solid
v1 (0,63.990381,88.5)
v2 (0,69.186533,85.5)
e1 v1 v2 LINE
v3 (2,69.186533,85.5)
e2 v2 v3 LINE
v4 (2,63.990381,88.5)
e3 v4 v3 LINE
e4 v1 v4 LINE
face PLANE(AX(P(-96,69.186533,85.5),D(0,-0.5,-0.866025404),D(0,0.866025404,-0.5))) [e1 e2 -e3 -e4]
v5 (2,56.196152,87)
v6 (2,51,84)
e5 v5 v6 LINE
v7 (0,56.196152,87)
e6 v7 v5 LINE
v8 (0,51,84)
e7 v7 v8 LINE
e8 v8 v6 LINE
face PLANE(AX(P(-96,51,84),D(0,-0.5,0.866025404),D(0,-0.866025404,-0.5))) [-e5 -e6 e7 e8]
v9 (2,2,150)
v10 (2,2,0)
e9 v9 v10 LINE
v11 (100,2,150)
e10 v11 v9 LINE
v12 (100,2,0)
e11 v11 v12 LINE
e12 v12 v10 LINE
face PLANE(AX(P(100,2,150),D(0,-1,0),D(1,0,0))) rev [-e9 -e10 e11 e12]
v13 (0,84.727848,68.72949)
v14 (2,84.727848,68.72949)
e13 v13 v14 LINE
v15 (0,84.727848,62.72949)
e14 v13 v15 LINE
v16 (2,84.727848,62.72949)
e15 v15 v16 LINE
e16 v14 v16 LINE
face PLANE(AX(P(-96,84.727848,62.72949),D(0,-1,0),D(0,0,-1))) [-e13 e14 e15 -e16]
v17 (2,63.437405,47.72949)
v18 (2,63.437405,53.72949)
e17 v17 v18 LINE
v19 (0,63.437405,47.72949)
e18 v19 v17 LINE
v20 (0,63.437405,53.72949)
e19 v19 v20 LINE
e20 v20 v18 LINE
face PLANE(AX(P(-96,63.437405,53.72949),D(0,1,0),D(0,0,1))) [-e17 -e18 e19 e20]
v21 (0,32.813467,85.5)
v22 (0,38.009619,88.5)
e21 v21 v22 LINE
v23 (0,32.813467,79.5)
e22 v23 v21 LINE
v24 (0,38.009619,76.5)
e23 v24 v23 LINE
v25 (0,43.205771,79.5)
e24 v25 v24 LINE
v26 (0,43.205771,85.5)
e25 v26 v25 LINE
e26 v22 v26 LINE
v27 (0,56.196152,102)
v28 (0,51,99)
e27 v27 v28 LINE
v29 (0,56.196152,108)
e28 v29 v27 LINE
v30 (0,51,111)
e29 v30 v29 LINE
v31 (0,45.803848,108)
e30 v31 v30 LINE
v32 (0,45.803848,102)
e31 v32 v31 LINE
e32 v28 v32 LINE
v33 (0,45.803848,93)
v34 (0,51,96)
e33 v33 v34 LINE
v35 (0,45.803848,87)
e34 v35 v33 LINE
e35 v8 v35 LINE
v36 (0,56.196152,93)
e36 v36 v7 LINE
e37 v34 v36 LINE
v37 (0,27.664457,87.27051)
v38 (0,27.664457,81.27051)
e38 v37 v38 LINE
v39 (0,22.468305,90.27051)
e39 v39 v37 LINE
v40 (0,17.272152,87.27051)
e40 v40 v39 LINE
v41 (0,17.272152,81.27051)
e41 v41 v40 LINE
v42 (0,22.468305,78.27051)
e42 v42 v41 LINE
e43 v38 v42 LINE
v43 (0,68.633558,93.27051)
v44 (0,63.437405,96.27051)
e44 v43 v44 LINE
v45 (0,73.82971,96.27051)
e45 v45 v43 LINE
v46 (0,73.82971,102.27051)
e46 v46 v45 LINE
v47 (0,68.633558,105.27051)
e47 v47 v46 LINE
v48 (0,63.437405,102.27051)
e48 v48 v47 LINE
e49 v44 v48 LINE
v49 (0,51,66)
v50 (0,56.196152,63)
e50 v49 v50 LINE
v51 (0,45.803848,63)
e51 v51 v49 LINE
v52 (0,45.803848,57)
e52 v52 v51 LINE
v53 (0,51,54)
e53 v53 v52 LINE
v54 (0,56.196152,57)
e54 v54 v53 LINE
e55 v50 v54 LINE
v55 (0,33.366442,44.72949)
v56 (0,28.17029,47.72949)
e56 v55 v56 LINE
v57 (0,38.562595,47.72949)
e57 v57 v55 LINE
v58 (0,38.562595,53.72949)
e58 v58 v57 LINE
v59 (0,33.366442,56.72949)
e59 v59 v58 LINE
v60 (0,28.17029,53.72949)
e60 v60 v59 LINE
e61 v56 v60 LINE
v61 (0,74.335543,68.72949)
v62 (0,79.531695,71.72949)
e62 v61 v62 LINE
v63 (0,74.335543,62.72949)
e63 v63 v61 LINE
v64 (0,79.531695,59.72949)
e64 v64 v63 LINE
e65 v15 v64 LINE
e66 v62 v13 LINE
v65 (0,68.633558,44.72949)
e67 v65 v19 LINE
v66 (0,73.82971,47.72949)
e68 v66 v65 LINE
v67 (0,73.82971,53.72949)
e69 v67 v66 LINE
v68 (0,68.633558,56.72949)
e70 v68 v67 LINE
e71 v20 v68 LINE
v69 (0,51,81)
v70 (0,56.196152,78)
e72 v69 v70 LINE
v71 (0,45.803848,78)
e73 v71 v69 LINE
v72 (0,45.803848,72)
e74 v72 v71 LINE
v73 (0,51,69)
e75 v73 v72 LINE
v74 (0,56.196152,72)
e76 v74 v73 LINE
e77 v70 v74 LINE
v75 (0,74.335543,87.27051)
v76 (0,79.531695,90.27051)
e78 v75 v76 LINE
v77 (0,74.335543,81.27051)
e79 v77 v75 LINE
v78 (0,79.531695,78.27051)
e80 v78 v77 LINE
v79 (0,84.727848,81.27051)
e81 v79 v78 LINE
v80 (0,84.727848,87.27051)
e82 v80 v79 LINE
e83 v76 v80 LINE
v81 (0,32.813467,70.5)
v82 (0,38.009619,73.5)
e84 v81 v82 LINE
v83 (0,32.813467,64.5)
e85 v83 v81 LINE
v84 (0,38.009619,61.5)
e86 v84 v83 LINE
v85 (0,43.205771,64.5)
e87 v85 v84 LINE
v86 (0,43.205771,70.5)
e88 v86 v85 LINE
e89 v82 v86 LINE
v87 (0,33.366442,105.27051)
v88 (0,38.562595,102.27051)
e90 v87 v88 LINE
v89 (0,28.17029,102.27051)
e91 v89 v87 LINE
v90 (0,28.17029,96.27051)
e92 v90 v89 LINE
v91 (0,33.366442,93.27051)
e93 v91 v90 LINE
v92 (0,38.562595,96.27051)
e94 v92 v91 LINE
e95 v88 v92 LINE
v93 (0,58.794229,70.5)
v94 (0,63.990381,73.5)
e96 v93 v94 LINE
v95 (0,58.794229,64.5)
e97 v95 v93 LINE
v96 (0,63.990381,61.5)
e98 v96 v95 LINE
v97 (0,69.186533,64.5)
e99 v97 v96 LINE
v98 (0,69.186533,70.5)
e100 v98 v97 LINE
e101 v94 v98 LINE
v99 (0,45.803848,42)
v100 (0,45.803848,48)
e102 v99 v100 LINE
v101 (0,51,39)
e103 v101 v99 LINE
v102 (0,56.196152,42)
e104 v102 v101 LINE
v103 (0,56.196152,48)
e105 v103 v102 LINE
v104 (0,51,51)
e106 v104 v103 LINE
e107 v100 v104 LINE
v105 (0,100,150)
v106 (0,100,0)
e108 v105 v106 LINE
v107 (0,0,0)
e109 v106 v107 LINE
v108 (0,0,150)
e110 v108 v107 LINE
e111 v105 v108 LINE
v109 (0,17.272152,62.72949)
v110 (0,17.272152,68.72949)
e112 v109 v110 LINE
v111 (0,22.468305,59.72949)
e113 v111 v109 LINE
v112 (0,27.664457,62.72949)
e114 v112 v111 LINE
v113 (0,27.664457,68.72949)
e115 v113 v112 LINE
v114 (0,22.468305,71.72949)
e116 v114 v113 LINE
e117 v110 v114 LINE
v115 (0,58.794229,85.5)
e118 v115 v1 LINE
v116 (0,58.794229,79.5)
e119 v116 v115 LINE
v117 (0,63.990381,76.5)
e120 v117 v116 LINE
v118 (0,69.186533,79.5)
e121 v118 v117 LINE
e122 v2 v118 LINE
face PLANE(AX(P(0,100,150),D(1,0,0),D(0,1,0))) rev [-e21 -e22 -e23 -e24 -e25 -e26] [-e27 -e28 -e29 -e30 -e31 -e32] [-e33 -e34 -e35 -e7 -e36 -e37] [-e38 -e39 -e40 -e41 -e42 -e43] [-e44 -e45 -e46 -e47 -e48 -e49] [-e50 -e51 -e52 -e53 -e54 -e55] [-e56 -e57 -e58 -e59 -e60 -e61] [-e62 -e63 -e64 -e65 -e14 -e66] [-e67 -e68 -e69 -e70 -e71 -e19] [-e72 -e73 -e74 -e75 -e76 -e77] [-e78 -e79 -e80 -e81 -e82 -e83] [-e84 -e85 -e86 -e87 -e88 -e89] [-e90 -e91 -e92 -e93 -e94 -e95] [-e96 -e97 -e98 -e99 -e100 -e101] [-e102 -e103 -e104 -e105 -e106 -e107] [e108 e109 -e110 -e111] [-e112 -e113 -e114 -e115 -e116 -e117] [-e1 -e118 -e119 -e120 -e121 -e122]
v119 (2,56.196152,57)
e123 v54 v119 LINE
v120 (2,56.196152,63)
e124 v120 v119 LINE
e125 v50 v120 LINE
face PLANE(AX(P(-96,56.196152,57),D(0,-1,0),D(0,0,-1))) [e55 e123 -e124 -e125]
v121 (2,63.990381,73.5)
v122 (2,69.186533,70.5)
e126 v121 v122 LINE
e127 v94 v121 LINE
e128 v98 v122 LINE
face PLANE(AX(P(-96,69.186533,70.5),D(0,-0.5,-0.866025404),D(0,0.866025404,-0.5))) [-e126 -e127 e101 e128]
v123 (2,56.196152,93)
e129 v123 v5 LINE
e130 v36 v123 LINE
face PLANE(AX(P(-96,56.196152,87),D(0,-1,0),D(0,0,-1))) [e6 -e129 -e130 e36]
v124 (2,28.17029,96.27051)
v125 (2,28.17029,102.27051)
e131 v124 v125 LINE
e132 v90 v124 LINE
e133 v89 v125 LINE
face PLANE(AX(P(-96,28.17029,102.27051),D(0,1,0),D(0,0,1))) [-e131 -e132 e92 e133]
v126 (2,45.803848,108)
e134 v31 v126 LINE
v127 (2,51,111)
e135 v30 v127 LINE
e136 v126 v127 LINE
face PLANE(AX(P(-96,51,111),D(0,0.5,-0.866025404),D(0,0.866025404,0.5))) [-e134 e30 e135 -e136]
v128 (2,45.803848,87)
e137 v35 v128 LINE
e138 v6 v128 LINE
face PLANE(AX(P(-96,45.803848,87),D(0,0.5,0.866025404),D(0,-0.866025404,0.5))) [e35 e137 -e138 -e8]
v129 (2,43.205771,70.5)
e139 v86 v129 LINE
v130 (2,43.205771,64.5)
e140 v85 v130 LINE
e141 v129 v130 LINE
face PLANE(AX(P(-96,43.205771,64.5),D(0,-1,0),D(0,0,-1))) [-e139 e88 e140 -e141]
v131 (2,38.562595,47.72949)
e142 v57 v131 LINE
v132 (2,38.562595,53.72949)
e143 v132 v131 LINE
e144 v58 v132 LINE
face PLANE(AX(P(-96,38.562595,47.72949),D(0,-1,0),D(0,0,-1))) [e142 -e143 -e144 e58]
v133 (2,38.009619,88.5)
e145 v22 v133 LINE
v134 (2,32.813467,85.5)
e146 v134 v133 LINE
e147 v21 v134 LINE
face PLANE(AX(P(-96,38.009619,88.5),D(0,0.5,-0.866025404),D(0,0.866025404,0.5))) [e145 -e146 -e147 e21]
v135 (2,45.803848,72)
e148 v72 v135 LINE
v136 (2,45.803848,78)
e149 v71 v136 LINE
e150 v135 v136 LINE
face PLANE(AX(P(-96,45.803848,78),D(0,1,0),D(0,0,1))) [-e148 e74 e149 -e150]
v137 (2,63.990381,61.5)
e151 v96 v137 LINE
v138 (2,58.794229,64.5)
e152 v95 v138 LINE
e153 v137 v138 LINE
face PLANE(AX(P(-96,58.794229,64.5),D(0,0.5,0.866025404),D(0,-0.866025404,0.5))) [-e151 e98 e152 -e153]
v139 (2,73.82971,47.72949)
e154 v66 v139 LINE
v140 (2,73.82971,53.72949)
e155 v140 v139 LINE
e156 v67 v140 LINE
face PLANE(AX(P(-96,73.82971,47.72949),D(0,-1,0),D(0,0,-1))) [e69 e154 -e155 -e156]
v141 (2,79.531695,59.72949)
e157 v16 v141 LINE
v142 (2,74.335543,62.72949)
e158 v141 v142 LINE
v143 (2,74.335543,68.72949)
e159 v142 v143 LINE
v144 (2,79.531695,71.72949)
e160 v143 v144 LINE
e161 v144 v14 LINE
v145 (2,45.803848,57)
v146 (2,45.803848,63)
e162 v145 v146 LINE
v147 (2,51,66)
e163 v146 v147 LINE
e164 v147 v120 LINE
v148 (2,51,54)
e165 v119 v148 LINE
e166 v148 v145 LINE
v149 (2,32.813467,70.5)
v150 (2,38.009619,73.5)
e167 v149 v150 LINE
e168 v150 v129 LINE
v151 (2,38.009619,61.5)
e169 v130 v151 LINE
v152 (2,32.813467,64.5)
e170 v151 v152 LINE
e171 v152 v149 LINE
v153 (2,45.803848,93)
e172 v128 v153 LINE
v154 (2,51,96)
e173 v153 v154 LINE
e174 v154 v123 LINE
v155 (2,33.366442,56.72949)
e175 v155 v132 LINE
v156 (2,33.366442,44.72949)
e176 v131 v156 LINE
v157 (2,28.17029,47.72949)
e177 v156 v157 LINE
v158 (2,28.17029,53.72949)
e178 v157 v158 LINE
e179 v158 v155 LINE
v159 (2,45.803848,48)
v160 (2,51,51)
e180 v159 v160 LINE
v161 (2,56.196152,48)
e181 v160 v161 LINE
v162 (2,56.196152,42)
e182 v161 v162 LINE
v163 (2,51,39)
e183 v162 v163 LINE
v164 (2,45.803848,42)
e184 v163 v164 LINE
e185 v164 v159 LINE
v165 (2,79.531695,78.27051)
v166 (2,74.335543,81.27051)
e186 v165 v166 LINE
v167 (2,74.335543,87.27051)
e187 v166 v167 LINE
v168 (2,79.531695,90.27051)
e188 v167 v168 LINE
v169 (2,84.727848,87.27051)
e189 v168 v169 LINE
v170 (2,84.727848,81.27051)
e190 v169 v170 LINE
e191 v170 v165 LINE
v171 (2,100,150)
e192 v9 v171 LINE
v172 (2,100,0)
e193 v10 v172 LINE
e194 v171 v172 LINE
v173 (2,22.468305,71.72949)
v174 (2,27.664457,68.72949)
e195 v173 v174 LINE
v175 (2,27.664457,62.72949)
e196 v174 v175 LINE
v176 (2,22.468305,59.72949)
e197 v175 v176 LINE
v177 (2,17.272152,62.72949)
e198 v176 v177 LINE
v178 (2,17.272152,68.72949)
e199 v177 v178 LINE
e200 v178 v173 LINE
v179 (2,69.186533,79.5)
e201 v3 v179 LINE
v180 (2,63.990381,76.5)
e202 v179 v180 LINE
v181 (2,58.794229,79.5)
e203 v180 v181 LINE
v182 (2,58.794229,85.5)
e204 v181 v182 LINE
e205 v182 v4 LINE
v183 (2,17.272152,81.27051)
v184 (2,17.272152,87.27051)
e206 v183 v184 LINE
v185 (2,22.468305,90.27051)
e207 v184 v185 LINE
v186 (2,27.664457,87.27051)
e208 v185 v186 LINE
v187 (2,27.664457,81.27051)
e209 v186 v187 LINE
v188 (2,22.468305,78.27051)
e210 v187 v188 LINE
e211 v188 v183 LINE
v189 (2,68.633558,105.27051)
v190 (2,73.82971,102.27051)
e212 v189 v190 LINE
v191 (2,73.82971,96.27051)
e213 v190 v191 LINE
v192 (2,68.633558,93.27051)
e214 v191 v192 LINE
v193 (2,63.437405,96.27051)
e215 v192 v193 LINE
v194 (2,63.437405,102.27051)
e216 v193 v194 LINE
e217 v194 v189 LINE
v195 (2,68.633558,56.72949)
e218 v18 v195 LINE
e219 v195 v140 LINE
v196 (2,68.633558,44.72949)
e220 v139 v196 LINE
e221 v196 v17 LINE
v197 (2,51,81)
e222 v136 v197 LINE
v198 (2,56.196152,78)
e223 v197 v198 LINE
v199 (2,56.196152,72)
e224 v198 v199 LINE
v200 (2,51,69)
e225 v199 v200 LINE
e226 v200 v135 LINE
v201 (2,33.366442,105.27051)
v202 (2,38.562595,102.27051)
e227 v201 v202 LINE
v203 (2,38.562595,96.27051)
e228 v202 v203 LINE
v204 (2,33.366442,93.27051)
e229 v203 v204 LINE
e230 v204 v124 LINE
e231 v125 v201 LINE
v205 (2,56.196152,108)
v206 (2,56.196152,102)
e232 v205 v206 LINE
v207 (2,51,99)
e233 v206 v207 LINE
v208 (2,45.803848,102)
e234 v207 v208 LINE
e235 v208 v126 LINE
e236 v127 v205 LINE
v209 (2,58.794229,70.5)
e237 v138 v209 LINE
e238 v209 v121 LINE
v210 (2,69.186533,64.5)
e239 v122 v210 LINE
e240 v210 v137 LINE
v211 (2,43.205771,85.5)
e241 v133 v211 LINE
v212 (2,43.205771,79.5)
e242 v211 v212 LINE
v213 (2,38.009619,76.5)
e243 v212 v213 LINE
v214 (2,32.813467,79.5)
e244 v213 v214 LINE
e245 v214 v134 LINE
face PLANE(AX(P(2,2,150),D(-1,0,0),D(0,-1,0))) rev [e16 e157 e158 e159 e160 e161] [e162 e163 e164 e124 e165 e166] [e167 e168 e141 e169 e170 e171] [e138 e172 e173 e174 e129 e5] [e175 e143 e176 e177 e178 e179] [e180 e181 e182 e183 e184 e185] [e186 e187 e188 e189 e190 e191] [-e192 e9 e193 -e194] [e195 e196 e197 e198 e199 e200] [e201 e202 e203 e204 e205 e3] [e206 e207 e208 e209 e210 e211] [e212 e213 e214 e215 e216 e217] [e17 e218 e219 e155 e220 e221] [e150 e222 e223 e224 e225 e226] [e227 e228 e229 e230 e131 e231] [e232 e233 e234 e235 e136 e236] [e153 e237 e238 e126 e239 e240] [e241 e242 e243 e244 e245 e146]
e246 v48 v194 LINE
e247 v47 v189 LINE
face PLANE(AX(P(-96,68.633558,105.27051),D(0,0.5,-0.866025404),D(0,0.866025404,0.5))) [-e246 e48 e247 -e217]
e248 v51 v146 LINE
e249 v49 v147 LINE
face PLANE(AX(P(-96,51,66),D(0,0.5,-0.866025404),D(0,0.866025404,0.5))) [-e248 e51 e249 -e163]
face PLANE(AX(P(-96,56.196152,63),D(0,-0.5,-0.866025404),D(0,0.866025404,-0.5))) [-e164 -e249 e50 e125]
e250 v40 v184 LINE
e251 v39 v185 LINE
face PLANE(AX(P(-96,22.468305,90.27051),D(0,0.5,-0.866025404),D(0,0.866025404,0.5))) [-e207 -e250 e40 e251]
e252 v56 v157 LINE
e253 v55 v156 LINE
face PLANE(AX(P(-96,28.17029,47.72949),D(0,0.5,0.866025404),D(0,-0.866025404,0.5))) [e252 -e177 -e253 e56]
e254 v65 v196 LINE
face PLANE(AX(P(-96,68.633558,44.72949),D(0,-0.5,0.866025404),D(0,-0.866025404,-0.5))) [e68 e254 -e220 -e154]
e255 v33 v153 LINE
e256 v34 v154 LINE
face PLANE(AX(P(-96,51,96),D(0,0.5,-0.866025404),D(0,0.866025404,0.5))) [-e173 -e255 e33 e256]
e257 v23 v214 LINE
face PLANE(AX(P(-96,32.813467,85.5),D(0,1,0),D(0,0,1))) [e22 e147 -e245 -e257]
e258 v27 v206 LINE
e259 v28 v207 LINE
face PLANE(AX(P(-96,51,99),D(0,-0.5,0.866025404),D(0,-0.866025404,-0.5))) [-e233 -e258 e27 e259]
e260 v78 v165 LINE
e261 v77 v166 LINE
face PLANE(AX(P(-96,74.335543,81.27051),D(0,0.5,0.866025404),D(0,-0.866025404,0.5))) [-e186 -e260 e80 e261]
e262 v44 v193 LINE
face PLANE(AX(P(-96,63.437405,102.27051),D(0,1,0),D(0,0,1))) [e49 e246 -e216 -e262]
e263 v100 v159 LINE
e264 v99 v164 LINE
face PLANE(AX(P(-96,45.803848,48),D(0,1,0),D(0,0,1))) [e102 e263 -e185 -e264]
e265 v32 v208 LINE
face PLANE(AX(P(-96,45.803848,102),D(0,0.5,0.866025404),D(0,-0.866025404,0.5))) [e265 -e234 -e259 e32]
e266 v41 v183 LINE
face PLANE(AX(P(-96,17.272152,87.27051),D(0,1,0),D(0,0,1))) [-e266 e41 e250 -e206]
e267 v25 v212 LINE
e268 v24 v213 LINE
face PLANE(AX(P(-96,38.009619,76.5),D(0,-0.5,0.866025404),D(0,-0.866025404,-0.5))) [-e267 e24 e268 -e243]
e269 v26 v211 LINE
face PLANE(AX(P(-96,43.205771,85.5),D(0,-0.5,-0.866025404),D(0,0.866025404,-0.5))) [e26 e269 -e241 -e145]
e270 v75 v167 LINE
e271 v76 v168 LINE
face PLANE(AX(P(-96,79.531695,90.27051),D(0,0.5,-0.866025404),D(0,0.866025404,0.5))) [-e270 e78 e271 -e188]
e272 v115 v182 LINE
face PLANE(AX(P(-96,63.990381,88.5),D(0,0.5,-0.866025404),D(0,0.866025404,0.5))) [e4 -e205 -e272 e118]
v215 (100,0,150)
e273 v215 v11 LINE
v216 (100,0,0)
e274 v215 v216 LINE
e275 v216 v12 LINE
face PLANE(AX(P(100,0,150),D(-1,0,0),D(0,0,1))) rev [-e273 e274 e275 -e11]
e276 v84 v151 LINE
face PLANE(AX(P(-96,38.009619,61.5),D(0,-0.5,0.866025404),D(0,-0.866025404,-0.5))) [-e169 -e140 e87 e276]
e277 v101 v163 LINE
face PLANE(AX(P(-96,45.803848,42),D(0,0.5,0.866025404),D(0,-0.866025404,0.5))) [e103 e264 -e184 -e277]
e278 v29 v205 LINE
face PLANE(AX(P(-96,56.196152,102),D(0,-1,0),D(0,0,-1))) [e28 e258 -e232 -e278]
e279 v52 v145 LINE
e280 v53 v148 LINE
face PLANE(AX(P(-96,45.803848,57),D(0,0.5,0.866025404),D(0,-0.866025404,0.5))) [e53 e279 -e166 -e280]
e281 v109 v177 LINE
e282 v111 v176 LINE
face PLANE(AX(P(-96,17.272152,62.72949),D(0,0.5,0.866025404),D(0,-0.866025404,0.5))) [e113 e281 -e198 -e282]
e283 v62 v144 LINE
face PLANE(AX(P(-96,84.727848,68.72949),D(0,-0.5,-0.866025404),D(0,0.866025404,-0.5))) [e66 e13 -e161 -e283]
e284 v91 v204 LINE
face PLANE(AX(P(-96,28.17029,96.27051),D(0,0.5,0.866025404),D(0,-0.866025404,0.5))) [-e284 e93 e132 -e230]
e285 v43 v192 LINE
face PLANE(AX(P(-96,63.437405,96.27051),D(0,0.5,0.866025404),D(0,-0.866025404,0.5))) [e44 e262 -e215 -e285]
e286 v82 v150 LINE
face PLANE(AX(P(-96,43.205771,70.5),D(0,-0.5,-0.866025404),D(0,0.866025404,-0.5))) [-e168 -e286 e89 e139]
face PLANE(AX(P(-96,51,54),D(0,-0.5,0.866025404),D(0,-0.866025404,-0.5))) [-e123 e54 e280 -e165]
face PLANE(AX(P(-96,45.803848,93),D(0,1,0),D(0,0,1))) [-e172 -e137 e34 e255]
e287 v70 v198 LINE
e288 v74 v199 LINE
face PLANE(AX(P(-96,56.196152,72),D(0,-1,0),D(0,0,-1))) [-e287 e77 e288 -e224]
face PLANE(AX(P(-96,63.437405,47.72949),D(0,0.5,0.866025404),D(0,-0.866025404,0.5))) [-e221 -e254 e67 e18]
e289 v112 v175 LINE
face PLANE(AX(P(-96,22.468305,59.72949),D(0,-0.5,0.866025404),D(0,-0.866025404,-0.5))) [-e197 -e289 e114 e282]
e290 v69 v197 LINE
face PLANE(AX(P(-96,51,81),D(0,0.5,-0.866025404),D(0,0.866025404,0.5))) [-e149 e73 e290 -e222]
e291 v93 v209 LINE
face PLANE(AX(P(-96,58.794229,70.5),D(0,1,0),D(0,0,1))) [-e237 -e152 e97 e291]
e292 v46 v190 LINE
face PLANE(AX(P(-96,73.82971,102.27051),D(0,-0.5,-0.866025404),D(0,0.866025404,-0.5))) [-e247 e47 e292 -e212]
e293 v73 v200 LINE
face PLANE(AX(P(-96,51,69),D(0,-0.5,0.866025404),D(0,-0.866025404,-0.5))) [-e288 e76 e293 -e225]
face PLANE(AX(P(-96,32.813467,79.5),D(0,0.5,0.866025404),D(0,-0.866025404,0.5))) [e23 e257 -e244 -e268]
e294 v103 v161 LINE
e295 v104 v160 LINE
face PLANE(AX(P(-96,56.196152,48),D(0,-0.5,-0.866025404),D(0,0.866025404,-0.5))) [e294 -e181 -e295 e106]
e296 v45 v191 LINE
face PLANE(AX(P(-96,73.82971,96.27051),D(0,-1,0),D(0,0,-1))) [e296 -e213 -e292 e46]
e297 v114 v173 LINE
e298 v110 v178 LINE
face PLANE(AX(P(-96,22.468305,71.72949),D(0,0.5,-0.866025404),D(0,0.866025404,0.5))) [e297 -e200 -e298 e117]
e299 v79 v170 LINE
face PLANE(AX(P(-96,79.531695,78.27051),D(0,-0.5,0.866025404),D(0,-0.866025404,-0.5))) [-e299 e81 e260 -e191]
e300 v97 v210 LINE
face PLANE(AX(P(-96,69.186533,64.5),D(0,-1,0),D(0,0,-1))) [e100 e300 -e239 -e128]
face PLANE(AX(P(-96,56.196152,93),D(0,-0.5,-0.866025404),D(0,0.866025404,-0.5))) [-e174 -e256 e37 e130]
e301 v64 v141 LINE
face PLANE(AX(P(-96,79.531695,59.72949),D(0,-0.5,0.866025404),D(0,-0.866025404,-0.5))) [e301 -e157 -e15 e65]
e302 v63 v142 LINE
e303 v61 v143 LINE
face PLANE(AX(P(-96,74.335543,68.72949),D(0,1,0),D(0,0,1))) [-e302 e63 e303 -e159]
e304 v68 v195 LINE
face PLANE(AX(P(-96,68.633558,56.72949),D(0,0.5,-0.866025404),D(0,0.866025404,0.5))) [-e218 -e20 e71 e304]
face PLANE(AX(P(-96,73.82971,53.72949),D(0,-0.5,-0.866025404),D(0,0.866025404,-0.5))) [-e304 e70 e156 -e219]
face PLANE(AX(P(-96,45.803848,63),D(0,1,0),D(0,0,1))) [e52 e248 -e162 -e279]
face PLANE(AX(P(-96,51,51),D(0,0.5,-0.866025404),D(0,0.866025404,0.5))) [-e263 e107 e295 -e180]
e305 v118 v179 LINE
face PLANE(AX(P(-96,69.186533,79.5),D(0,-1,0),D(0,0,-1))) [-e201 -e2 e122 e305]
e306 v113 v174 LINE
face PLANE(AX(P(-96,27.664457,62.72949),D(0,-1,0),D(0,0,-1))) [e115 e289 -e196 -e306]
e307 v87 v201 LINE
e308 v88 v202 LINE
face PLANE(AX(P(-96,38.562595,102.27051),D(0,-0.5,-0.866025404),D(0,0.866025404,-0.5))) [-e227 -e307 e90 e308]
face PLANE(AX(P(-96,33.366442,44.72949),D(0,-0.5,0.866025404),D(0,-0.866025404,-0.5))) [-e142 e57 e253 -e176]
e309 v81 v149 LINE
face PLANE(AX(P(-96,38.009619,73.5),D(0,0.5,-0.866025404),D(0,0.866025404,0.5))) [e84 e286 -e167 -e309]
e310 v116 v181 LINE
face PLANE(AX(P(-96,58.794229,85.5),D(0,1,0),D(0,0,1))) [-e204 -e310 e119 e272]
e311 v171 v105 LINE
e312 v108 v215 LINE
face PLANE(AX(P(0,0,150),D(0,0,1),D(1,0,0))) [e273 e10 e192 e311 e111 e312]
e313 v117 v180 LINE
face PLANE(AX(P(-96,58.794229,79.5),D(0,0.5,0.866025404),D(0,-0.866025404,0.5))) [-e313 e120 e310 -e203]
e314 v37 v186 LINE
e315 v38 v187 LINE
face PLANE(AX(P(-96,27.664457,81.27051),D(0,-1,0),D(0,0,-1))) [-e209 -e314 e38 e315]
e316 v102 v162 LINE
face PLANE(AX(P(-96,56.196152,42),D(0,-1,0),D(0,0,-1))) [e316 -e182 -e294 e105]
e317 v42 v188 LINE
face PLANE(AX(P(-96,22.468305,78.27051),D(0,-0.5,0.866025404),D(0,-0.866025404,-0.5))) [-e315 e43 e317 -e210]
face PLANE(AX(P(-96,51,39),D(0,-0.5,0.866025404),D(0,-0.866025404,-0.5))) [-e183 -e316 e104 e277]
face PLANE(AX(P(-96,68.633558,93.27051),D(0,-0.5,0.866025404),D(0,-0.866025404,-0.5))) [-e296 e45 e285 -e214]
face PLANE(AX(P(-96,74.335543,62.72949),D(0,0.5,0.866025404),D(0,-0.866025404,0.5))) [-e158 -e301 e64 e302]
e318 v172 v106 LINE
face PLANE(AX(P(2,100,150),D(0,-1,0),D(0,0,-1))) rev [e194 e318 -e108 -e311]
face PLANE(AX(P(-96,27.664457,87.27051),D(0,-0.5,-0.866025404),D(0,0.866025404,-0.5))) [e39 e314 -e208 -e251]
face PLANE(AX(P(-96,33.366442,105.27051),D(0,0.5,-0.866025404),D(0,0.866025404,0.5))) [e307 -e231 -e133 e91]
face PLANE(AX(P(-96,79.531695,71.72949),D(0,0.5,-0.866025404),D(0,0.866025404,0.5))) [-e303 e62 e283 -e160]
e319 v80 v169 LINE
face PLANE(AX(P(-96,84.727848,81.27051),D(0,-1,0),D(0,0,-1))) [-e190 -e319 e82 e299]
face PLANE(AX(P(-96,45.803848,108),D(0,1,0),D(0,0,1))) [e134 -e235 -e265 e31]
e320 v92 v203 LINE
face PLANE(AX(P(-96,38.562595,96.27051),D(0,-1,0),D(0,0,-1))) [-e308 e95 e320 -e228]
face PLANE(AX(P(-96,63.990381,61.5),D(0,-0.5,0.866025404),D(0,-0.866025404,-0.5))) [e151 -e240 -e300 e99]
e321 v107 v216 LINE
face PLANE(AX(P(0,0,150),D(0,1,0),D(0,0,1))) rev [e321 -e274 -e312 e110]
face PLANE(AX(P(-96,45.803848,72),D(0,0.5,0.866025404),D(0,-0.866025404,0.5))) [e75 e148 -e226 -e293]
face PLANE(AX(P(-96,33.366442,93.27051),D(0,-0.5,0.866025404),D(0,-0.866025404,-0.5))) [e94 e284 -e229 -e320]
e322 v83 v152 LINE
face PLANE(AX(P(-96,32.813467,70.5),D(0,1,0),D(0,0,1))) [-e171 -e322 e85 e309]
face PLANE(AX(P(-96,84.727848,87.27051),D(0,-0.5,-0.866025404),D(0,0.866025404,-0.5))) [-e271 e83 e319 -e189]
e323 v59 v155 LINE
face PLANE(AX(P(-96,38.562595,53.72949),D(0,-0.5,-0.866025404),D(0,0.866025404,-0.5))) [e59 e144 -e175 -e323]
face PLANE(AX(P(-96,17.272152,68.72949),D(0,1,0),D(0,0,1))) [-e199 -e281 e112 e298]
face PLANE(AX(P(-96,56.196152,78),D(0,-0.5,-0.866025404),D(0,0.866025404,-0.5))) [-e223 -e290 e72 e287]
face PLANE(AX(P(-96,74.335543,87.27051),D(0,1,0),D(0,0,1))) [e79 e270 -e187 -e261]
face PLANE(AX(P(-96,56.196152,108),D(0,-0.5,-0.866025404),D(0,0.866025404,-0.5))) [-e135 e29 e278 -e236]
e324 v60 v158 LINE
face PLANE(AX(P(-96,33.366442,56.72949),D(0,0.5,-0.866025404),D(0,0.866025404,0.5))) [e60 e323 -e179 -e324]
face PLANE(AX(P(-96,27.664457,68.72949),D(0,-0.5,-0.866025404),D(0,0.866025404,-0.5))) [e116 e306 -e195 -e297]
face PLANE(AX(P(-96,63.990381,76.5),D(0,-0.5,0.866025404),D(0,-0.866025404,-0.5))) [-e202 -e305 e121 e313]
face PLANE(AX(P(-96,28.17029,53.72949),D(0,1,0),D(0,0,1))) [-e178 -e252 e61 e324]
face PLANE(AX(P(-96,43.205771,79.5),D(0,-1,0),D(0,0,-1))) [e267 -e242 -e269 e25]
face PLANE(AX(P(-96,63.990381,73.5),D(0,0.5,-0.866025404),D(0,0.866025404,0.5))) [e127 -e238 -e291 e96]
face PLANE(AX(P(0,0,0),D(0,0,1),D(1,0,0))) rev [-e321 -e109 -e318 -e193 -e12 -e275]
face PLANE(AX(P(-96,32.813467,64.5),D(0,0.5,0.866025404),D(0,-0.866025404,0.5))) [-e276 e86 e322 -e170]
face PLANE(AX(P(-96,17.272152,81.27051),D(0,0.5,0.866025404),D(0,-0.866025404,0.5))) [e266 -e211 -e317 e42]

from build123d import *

# Parameters (mm, degrees)
BOSS_EXTRUDE1_DEPTH = 150
FILL_PATTERN1_DEPTH = 2


# Read off the part's stored shape, not the designer's step: Fill Pattern1
with BuildPart() as part:
    # Sketch1 → Boss-Extrude1 (new body)
    with BuildSketch(Plane.XY):
        Polygon((0, 0), (100, 0), (100, 2), (2, 2), (2, 100), (0, 100), align=None)
    extrude(amount=BOSS_EXTRUDE1_DEPTH)

    # Fill Pattern1 outline → Fill Pattern1 (cut)
    with BuildSketch(Plane.YZ):
        Polygon((51, 81), (45.803847577, 78), (45.803847577, 72), (51, 69), (56.196152423, 72), (56.196152423, 78), align=None)
        Polygon((63.990381057, 88.5), (58.794228634, 85.5), (58.794228634, 79.5), (63.990381057, 76.5), (69.186533479, 79.5), (69.186533479, 85.5), align=None)
        Polygon((38.009618943, 73.5), (32.813466521, 70.5), (32.813466521, 64.5), (38.009618943, 61.5), (43.205771366, 64.5), (43.205771366, 70.5), align=None)
        Polygon((45.803847577, 63), (45.803847577, 57), (51, 54), (56.196152423, 57), (56.196152423, 63), (51, 66), align=None)
        Polygon((45.803847577, 108), (45.803847577, 102), (51, 99), (56.196152423, 102), (56.196152423, 108), (51, 111), align=None)
        Polygon((45.803847577, 93), (45.803847577, 87), (51, 84), (56.196152423, 87), (56.196152423, 93), (51, 96), align=None)
        Polygon((45.803847577, 48), (45.803847577, 42), (51, 39), (56.196152423, 42), (56.196152423, 48), (51, 51), align=None)
        Polygon((58.794228634, 64.5), (63.990381057, 61.5), (69.186533479, 64.5), (69.186533479, 70.5), (63.990381057, 73.5), (58.794228634, 70.5), align=None)
        Polygon((32.813466521, 79.5), (38.009618943, 76.5), (43.205771366, 79.5), (43.205771366, 85.5), (38.009618943, 88.5), (32.813466521, 85.5), align=None)
        Polygon((79.531695489, 90.270509831), (74.335543066, 87.270509831), (74.335543066, 81.270509831), (79.531695489, 78.270509831), (84.727847912, 81.270509831), (84.727847912, 87.270509831), align=None)
        Polygon((74.335543066, 68.729490169), (74.335543066, 62.729490169), (79.531695489, 59.729490169), (84.727847912, 62.729490169), (84.727847912, 68.729490169), (79.531695489, 71.729490169), align=None)
        Polygon((68.633557569, 105.270509831), (63.437405146, 102.270509831), (63.437405146, 96.270509831), (68.633557569, 93.270509831), (73.829709991, 96.270509831), (73.829709991, 102.270509831), align=None)
        Polygon((63.437405146, 53.729490169), (63.437405146, 47.729490169), (68.633557569, 44.729490169), (73.829709991, 47.729490169), (73.829709991, 53.729490169), (68.633557569, 56.729490169), align=None)
        Polygon((33.366442431, 105.270509831), (28.170290009, 102.270509831), (28.170290009, 96.270509831), (33.366442431, 93.270509831), (38.562594854, 96.270509831), (38.562594854, 102.270509831), align=None)
        Polygon((28.170290009, 53.729490169), (28.170290009, 47.729490169), (33.366442431, 44.729490169), (38.562594854, 47.729490169), (38.562594854, 53.729490169), (33.366442431, 56.729490169), align=None)
        Polygon((22.468304511, 90.270509831), (17.272152088, 87.270509831), (17.272152088, 81.270509831), (22.468304511, 78.270509831), (27.664456934, 81.270509831), (27.664456934, 87.270509831), align=None)
        Polygon((17.272152088, 68.729490169), (17.272152088, 62.729490169), (22.468304511, 59.729490169), (27.664456934, 62.729490169), (27.664456934, 68.729490169), (22.468304511, 71.729490169), align=None)
    extrude(amount=FILL_PATTERN1_DEPTH, mode=Mode.SUBTRACT)


solid = part.part
